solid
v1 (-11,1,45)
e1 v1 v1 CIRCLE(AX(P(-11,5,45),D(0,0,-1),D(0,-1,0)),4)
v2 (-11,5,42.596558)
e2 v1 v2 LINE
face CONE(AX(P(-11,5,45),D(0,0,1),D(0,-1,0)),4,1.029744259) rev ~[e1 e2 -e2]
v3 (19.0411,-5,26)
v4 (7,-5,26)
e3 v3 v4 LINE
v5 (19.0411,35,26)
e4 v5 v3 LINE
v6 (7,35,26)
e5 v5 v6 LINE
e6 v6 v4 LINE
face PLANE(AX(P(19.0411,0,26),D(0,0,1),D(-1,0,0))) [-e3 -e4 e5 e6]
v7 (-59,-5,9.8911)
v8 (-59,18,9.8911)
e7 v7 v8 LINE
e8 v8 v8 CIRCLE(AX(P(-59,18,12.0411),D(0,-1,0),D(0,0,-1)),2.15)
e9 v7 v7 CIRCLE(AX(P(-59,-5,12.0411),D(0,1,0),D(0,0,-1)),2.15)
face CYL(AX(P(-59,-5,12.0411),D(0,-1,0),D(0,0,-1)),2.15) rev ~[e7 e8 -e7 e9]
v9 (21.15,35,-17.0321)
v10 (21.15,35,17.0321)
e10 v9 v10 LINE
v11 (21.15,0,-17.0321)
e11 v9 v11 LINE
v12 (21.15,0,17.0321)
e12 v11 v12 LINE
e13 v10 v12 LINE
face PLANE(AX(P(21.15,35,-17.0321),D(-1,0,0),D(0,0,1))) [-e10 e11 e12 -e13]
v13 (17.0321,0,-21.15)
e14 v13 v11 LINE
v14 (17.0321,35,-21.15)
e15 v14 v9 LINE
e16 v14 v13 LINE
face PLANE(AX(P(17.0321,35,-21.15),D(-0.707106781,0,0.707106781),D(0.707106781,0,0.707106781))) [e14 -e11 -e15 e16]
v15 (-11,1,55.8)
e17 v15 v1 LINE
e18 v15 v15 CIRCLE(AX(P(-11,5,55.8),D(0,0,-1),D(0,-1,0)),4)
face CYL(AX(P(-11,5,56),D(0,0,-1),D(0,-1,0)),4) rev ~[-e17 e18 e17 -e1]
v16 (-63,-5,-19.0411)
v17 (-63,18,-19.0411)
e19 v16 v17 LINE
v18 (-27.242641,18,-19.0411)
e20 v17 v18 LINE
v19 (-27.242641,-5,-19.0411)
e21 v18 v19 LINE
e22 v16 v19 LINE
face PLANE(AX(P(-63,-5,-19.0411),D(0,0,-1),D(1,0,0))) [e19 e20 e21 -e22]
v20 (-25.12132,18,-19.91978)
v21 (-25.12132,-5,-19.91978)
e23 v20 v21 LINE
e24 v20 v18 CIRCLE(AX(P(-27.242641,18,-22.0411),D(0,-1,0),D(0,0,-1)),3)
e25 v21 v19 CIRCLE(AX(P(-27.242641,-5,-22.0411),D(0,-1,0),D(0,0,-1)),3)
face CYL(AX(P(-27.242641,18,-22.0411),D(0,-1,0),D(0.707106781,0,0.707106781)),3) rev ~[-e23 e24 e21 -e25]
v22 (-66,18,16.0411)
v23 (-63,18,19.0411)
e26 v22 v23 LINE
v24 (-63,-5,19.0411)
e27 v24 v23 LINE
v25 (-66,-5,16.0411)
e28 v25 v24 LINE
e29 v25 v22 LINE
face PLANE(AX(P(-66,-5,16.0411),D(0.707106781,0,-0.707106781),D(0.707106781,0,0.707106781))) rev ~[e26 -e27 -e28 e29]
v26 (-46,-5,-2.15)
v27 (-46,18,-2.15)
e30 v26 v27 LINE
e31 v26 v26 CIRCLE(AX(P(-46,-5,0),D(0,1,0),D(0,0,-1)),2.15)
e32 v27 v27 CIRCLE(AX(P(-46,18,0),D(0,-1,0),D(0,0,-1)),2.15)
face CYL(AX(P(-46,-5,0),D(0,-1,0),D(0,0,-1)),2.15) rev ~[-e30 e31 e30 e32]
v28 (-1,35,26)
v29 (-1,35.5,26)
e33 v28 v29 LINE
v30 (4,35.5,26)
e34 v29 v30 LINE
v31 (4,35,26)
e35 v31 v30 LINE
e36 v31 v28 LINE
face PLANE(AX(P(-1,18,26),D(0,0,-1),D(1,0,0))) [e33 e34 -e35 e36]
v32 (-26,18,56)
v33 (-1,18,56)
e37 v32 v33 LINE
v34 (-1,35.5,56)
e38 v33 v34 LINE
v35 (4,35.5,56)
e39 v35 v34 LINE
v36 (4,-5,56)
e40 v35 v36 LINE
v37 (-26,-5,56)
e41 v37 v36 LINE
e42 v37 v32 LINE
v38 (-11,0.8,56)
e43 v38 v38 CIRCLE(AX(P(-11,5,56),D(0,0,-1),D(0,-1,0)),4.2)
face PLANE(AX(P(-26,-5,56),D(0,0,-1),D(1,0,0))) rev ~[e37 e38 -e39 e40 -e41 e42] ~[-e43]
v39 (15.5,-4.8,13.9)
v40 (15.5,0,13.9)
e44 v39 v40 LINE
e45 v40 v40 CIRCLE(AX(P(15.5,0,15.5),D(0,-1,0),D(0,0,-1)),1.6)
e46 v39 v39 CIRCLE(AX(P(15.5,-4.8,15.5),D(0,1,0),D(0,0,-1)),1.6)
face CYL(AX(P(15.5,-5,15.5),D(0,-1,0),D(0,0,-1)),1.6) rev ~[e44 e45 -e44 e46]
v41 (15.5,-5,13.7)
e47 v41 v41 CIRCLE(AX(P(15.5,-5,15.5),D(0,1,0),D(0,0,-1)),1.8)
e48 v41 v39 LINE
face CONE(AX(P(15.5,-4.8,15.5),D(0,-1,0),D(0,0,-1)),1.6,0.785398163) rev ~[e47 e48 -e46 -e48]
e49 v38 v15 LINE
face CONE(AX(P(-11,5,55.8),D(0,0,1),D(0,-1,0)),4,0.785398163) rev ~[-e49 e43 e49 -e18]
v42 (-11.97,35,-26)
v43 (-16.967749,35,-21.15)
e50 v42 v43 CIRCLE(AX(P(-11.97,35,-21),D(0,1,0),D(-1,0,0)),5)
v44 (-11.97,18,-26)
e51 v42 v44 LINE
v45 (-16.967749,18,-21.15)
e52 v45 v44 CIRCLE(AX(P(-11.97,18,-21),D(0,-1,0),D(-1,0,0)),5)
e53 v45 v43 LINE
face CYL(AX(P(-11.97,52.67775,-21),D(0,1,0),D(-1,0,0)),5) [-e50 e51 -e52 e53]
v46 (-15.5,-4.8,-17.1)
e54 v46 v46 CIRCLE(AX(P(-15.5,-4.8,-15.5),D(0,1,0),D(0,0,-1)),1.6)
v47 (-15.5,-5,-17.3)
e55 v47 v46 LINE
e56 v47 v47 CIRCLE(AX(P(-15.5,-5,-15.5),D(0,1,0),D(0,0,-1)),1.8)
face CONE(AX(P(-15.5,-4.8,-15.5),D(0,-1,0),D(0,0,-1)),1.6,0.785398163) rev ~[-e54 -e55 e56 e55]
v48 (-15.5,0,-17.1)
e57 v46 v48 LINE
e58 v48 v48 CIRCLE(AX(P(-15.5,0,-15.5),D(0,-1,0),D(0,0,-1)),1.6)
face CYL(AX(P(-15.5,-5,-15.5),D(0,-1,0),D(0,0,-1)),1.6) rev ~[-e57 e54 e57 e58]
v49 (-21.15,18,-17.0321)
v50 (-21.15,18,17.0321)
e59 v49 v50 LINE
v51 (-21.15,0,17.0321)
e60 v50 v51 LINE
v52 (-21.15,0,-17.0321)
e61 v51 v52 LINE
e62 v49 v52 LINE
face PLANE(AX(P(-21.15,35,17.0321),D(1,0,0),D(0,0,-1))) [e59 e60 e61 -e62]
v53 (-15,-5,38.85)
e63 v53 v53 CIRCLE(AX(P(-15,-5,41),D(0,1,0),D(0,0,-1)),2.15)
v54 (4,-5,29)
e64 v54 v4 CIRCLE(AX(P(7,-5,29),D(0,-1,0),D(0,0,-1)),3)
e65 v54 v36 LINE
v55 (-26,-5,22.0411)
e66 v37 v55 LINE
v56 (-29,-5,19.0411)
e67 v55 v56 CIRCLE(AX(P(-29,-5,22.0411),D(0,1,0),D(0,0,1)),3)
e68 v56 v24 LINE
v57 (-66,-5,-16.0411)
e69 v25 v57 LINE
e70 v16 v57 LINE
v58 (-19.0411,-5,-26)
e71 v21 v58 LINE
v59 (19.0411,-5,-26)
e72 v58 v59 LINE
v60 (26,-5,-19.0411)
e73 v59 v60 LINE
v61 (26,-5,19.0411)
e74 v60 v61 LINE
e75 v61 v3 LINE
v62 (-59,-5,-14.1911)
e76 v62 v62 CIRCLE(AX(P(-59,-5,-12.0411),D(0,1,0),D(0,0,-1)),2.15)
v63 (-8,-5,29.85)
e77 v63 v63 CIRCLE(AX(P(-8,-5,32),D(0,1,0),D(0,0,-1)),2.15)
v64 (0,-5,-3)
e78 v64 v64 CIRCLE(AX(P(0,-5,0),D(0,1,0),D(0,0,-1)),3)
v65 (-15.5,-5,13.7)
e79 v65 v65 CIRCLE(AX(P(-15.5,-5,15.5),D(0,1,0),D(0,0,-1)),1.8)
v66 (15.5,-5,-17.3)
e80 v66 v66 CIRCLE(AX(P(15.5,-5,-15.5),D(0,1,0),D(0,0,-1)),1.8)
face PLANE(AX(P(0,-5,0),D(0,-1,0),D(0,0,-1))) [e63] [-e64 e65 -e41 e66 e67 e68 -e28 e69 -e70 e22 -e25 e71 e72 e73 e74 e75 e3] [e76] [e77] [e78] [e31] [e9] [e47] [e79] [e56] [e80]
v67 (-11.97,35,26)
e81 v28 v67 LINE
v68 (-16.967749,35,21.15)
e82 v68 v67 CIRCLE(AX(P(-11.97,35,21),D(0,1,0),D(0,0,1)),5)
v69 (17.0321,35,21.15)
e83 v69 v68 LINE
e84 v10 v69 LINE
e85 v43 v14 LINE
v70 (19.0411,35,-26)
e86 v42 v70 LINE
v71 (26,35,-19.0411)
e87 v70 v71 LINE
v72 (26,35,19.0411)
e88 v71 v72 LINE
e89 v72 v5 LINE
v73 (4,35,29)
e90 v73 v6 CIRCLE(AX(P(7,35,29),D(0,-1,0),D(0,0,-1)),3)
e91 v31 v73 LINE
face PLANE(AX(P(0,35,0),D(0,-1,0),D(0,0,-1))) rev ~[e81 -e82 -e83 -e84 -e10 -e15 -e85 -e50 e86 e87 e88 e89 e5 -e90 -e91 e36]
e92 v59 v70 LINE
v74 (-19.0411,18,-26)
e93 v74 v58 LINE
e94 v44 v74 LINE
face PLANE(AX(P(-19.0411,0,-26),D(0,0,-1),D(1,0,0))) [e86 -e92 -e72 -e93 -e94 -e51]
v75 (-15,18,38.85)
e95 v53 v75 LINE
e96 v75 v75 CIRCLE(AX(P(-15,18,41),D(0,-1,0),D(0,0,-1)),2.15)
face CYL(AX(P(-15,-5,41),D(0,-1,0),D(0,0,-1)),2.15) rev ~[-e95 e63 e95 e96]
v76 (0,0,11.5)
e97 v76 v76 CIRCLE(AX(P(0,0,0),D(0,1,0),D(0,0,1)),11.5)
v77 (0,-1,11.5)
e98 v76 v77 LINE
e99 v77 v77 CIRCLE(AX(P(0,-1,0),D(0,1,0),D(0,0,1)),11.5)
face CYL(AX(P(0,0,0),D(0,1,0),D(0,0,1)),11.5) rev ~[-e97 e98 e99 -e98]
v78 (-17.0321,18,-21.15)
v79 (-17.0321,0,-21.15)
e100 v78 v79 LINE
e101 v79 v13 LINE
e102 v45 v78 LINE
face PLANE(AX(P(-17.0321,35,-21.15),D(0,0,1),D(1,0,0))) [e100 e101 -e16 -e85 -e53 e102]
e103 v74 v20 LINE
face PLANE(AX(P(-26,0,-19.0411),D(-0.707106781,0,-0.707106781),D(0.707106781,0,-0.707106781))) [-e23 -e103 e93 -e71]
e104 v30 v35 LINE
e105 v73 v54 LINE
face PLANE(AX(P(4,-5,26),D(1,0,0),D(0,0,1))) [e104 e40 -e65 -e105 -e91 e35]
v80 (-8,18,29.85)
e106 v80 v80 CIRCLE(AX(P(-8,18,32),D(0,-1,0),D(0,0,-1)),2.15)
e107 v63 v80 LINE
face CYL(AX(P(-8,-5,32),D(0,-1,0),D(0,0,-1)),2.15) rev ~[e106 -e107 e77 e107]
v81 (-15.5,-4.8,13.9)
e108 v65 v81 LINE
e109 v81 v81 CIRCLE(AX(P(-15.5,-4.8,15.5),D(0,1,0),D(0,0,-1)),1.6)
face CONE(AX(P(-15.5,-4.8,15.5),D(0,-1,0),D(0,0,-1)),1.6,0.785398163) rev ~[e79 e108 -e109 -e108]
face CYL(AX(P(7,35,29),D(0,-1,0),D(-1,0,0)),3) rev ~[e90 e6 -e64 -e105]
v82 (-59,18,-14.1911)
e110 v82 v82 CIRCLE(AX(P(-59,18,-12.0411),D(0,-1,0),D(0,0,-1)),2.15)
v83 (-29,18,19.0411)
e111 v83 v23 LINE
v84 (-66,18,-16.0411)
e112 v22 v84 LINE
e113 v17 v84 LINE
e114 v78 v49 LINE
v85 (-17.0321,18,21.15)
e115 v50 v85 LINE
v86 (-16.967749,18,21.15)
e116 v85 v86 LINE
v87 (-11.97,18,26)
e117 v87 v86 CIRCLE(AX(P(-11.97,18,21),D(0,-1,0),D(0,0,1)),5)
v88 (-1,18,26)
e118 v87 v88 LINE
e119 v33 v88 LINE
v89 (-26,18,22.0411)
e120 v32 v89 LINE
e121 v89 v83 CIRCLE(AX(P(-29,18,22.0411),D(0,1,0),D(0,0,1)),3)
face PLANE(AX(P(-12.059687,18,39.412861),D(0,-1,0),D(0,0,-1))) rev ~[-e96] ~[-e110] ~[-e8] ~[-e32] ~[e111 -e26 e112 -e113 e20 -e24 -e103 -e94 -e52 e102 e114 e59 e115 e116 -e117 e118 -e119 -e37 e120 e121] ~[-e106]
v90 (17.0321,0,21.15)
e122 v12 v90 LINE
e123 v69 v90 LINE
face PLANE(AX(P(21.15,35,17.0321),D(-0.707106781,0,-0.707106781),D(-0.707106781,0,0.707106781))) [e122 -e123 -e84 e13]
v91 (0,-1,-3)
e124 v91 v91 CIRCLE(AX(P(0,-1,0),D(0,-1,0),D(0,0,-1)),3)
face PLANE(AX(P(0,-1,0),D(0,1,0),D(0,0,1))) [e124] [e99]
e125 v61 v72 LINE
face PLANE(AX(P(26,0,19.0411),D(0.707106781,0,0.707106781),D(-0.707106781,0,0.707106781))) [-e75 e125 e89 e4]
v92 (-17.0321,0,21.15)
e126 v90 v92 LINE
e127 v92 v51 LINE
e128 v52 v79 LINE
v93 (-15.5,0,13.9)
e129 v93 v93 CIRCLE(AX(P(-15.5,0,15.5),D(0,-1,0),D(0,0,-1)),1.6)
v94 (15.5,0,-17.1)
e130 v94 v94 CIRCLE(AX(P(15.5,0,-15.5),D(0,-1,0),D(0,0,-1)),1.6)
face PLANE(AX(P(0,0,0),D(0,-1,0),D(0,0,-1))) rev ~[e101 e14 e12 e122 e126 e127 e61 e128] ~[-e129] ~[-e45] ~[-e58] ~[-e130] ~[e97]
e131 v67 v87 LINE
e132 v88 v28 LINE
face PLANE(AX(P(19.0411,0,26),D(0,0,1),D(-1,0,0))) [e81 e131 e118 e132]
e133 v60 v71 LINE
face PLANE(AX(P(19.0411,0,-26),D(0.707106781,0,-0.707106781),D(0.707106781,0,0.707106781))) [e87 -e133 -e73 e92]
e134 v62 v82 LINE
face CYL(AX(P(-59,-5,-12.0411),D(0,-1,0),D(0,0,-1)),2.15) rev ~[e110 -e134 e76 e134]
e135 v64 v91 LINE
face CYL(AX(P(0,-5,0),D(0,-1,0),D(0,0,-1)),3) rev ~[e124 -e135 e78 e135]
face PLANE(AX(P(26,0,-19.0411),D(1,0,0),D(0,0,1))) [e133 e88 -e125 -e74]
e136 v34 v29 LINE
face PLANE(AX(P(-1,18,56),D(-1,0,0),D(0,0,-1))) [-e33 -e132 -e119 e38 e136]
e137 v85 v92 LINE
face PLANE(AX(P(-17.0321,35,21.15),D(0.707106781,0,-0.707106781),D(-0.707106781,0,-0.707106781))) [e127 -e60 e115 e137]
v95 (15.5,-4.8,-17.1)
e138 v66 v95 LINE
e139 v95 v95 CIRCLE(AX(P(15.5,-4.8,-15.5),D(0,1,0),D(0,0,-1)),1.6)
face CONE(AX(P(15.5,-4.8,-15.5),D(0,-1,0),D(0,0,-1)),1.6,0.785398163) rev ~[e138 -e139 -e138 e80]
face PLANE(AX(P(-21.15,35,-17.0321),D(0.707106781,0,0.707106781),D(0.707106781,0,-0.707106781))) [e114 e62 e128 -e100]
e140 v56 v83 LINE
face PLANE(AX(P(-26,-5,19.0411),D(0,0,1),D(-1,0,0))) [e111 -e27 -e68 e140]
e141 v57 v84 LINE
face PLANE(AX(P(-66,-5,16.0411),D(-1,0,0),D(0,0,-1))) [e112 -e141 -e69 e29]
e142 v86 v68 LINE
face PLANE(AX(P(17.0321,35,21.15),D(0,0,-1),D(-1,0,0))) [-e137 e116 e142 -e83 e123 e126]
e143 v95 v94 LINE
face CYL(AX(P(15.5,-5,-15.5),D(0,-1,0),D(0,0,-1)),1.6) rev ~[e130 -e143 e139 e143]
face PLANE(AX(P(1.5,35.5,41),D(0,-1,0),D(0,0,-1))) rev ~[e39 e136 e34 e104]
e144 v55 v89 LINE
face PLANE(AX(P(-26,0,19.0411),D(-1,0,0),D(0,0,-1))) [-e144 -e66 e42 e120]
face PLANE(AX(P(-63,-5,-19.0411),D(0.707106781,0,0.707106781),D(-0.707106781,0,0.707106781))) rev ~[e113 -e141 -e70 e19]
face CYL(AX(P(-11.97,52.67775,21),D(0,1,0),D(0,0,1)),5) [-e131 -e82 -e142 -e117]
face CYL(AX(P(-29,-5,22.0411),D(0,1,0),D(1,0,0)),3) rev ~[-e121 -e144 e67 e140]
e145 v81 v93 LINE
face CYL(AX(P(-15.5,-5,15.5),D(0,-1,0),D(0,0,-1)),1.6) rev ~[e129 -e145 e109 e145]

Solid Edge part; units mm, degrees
sketch "Sketch1" plane through (0, 0, 0) normal (0, -1, 0) x (1, 0, 0)
  line L0 (21, 16.97) -> (16.97, 21)
  line L1 (16.97, 21) -> (-16.97, 21)
  line L2 (-16.97, 21) -> (-21, 16.97)
  line L3 (-21, 16.97) -> (-21, -16.97)
  line L4 (-21, -16.97) -> (-16.97, -21)
  line L5 (-16.97, -21) -> (16.97, -21)
  line L6 (16.97, -21) -> (21, -16.97)
  line L7 (21, -16.97) -> (21, 16.97)
  line L8 (26, 19.0411) -> (19.0411, 26)
  line L9 (19.0411, 26) -> (-19.0411, 26)
  line L10 (-19.0411, 26) -> (-26, 19.0411)
  line L11 (-26, 19.0411) -> (-26, -19.0411)
  line L12 (-26, -19.0411) -> (-19.0411, -26)
  line L13 (-19.0411, -26) -> (19.0411, -26)
  line L14 (19.0411, -26) -> (26, -19.0411)
  line L15 (26, -19.0411) -> (26, 19.0411)
  dimension "D1" = 33.94
  dimension "D2" = 33.94
  dimension "D3" = 33.94
  dimension "D4" = 33.94
  dimension "D5" = 42
  dimension "D6" = 42
  dimension "D7" = 21
  dimension "D8" = 5
extrude "Protrusion1" add sketch "Sketch1" against normal blind 35
sketch "Sketch2" plane through (0, 0, 0) normal (0, -1, 0) x (1, 0, 0)
  line L0 (19.0411, 26) -> (-19.0411, 26)
  line L1 (-19.0411, 26) -> (-26, 19.0411)
  line L2 (-26, 19.0411) -> (-26, -19.0411)
  line L3 (-26, -19.0411) -> (-19.0411, -26)
  line L4 (-19.0411, -26) -> (19.0411, -26)
  line L5 (19.0411, -26) -> (26, -19.0411)
  line L6 (26, -19.0411) -> (26, 19.0411)
  line L7 (26, 19.0411) -> (19.0411, 26)
extrude "Deckel" add sketch "Sketch2" along normal blind 5
hole "Motorwelle" at (0, -5, 0) direction (0, 1, 0) diameter 6 end up to next
hole "Hole1" at (-15.5, -5, -15.5) direction (0, 1, 0) diameter 3.2 end up to next start chamfer 0.2 start chamfer angle 45
hole "Hole2" at (-15.5, -5, 15.5) direction (0, 1, 0) diameter 3.2 end up to next start chamfer 0.2 start chamfer angle 45
hole "Hole3" at (15.5, -5, 15.5) direction (0, 1, 0) diameter 3.2 end up to next start chamfer 0.2 start chamfer angle 45
hole "Hole4" at (15.5, -5, -15.5) direction (0, 1, 0) diameter 3.2 end up to next start chamfer 0.2 start chamfer angle 45
sketch "Sketch3" plane through (0, 0, 0) normal (0, 1, 0) x (0, 0, 1)
  circle A0 centre (0, 0) radius 11.5
  dimension "D1" = 23
extrude "Motoflansch" cut sketch "Sketch3" against normal blind 1
sketch "Sketch4" plane through (0, -5, 0) normal (0, -1, 0) x (1, 0, 0)
  line L0 (-26, 19.0411) -> (-19.0411, 26)
  line L1 (-19.0411, 26) -> (4, 26)
  line L2 (4, 26) -> (4, 56)
  line L3 (-26, 56) -> (4, 56)
  line L4 (-26, 19.0411) -> (-26, 56)
  dimension "D1" = 30
  dimension "D2" = 30
extrude "Motoraufhängung_Leiste" add sketch "Sketch4" against normal blind 23
sketch "Sketch5" plane through (-13, 18, 33.5205) normal (0, 1, 0) x (-1, 0, 0)
  line L0 (-17, -7.5205) -> (-17, 22.4795)
  line L1 (-17, 22.4795) -> (-12, 22.4795)
  line L2 (-12, 22.4795) -> (-12, -7.5205)
  line L3 (-12, -7.5205) -> (-17, -7.5205)
  dimension "D1" = 5
extrude "Zentrierung_Leiste" add sketch "Sketch5" along normal blind 17.5
sketch "Sketch6" plane through (0, -5, 11) normal (0, -1, 0) x (1, 0, 0)
  line L0 (-26, -30.0411) -> (-26, 8.0411)
  line L1 (-26, 8.0411) -> (-63, 8.0411)
  line L2 (-66, 5.0411) -> (-63, 8.0411)
  line L3 (-66, 5.0411) -> (-66, -27.0411)
  line L4 (-63, -30.0411) -> (-66, -27.0411)
  line L5 (-63, -30.0411) -> (-26, -30.0411)
  dimension "D1" = 3
  dimension "D2" = 3
  dimension "D3" = 40
extrude "Auflage_auf_Platte" add sketch "Sketch6" against normal blind 23
hole "Bohrung_Alustange" at (-11, 5, 56) direction (0, 0, -1) diameter 8 depth 11 tip angle 118 start chamfer 0.2 start chamfer angle 45
sketch "Sketch7" plane through (0, 35, 0) normal (0, 1, 0) x (1, 0, 0)
  line L0 (-19.0411, 26) -> (-16.97, 21)
  line L1 (-16.97, 21) -> (-16.97, -21)
  line L2 (-16.97, -21) -> (-19.0411, -26)
  line L3 (-19.0411, -26) -> (-26, -26)
  line L4 (-26, -26) -> (-26, 26)
  line L5 (-26, 26) -> (-19.0411, 26)
extrude "Motorseite" cut sketch "Sketch7" against normal blind 17
hole "Hole5" at (-8, -5, 32) direction (0, 1, 0) diameter 4.3 end up to next
hole "Hole6" at (-15, -5, 41) direction (0, 1, 0) diameter 4.3 end up to next
hole "Hole7" at (-59, -5, 12.0411) direction (0, 1, 0) diameter 4.3 end up to next
hole "Hole8" at (-59, -5, -12.0411) direction (0, 1, 0) diameter 4.3 end up to next
hole "Hole9" at (-46, -5, 0) direction (0, 1, 0) diameter 4.3 end up to next
fillet "Verrundung_Innen" radius 3 3 edges at (-26, 6.5, -19.0411) (-26, 6.5, 19.0411) (4, 15, 26)
fillet "Verrundung_spitzeEcke" radius 5 2 edges at (-19.0411, 26.5, 26) (-19.0411, 26.5, -26)
sketch "Sketch8" plane through (4.515, 35, 1.5) normal (0, 1, 0) x (0, 0, -1)
  line L0 (-15.5321, 25.665) -> (18.5321, 25.665)
  line L1 (18.5321, 25.665) -> (22.65, 21.5471)
  line L2 (22.65, 21.5471) -> (22.65, -12.5171)
  line L3 (22.65, -12.5171) -> (18.5321, -16.635)
  line L4 (18.5321, -16.635) -> (-15.5321, -16.635)
  line L5 (-15.5321, -16.635) -> (-19.65, -12.5171)
  line L6 (-19.65, -12.5171) -> (-19.65, 21.5471)
  line L7 (-19.65, 21.5471) -> (-15.5321, 25.665)
extrude "Verbreiterung" cut sketch "Sketch8" against normal blind 35
